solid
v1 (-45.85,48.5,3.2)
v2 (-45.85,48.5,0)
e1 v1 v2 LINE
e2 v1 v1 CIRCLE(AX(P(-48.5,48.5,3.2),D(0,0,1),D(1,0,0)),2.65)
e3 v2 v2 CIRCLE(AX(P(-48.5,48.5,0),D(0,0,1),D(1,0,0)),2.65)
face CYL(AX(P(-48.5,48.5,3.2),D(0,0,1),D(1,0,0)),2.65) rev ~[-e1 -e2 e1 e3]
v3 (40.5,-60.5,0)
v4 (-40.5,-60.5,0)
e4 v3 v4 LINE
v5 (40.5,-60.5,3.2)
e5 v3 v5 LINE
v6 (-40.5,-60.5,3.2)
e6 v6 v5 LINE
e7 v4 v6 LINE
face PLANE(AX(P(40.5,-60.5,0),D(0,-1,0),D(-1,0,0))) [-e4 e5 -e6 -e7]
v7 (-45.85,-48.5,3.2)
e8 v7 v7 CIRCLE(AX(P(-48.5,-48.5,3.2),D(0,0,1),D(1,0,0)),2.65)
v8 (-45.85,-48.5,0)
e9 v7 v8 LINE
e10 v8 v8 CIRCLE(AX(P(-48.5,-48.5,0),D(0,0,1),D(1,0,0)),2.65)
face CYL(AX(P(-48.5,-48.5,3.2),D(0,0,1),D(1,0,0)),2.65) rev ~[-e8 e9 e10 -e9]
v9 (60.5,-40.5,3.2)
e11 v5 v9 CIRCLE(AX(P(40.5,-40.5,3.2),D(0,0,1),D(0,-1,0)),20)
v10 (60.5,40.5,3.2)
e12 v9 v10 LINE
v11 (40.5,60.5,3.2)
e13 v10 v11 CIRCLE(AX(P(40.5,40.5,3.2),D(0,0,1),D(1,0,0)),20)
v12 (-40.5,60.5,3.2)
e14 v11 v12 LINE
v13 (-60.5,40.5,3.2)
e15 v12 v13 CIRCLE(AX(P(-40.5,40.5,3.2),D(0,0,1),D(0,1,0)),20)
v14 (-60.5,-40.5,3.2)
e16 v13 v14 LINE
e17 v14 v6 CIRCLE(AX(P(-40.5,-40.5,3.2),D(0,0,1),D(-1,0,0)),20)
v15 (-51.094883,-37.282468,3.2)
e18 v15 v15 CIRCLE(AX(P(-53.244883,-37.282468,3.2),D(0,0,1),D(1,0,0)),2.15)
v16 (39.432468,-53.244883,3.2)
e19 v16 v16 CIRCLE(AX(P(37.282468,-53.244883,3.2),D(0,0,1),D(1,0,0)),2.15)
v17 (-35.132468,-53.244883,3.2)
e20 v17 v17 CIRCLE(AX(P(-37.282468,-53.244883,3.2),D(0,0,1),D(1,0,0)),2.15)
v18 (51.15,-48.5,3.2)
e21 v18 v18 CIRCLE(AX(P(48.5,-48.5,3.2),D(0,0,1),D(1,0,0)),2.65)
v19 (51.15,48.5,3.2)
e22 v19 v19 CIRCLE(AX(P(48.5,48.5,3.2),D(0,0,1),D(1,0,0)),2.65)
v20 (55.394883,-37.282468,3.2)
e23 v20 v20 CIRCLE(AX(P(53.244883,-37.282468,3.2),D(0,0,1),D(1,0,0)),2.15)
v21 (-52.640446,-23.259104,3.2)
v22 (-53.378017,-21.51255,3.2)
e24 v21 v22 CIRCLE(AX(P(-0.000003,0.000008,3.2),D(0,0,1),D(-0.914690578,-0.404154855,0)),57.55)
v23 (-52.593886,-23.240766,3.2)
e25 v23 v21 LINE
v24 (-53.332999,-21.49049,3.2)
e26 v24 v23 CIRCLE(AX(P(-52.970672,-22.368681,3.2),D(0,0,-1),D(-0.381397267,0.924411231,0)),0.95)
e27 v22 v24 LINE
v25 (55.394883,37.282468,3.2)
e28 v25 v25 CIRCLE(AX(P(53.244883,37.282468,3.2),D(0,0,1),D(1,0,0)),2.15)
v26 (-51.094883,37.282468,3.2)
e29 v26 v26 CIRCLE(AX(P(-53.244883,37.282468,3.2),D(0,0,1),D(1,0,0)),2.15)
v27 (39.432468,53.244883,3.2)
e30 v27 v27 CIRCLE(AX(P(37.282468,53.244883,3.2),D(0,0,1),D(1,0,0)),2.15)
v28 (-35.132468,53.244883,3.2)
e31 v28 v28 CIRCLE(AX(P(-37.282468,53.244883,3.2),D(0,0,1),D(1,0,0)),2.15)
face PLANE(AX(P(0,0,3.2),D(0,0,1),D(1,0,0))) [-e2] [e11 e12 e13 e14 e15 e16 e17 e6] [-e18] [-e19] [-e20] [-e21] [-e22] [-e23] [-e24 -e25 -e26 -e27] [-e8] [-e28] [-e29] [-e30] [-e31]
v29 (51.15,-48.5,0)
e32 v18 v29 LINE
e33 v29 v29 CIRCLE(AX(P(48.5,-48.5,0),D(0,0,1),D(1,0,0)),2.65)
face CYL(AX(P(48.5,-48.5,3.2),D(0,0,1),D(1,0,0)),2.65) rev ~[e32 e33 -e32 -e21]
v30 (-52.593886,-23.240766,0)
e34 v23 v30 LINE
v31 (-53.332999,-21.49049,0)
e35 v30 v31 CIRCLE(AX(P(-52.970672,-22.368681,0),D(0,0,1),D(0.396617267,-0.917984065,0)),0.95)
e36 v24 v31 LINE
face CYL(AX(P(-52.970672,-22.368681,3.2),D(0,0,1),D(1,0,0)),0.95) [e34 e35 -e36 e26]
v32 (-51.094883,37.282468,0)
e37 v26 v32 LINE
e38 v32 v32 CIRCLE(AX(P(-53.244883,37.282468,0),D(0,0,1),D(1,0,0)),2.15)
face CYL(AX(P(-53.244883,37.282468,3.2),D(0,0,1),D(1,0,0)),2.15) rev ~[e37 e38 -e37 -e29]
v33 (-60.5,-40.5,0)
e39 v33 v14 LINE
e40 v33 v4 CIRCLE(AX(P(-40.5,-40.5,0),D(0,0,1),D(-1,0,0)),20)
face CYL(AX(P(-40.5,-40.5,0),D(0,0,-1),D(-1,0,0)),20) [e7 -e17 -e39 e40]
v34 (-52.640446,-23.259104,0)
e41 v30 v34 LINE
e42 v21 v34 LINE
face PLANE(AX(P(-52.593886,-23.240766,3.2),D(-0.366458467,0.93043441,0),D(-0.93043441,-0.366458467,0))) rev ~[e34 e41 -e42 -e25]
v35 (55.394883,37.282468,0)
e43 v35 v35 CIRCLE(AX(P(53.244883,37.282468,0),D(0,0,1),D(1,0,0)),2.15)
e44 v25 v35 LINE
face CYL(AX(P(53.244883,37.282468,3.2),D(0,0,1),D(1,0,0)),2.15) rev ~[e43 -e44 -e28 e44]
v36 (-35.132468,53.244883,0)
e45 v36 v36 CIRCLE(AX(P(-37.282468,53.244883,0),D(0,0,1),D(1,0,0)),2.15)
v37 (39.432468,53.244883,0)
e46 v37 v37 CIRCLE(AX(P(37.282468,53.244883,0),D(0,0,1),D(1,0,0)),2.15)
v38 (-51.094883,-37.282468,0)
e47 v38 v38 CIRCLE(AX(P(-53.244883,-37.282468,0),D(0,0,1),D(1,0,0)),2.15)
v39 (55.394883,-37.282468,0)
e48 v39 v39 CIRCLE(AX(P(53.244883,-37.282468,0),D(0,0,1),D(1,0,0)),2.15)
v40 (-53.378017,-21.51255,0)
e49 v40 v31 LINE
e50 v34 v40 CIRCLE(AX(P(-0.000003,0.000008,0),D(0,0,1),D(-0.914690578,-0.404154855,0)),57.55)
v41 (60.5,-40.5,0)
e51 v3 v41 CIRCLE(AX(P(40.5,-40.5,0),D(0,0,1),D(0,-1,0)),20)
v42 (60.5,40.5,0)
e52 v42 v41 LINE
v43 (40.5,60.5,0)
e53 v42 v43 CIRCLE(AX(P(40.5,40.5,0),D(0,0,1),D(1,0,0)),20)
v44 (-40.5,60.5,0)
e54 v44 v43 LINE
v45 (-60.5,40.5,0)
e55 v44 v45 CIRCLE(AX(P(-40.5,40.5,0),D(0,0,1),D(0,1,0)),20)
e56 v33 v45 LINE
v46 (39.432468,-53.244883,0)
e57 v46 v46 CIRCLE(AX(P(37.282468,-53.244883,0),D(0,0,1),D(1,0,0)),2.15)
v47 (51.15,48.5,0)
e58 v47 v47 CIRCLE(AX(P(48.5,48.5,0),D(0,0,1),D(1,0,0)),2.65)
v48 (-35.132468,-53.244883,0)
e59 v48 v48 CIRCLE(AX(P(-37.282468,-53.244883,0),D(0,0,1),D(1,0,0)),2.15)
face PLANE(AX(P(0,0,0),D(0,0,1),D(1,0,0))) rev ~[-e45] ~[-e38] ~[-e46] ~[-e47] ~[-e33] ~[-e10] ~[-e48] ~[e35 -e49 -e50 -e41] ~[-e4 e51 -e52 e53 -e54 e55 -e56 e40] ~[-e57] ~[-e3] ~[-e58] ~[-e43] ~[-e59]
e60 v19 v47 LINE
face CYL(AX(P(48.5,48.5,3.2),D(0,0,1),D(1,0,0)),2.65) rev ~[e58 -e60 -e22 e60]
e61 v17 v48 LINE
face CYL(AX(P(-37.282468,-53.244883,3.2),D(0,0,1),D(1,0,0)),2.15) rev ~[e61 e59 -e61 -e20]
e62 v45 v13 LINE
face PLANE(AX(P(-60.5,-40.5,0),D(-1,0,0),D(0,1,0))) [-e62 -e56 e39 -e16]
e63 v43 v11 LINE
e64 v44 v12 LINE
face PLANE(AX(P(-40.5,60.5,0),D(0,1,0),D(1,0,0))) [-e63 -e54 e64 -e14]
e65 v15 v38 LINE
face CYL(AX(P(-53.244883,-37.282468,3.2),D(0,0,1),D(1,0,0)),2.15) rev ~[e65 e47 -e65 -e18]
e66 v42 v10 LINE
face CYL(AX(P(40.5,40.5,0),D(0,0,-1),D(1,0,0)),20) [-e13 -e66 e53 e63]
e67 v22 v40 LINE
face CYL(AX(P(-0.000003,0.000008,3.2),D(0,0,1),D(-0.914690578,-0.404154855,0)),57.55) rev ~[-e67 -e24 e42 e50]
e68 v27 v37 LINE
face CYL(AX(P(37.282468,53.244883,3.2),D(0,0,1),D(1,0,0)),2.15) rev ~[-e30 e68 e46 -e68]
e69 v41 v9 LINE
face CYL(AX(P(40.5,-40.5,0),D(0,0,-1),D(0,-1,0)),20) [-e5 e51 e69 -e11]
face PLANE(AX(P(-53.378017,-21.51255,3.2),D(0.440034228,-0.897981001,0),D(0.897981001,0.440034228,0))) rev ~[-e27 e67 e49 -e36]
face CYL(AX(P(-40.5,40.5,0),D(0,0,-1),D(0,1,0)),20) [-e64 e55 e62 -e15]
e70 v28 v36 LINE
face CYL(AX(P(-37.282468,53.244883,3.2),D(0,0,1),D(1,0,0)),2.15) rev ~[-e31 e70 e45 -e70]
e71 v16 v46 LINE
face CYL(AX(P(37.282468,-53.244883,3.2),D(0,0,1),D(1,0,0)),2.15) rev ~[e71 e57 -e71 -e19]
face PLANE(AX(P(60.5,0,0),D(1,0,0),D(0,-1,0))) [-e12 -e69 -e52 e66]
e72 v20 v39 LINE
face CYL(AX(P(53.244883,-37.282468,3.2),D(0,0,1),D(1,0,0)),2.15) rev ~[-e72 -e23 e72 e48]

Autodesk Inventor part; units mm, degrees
ref_plane "YZ Plane" through (0, 0, 0) normal (1, 0, 0) x (0, 1, 0)
ref_plane "XZ Plane" through (0, 0, 0) normal (0, 1, 0) x (-1, 0, 0)
ref_plane "XY Plane" through (0, 0, 0) normal (0, 0, 1) x (1, 0, 0)
sketch "Sketch1" plane through (0, 0, 0) normal (0, 0, 1) x (1, 0, 0)
  circle A0 centre (0, 0) radius 57.5
  circle A1 centre (0, 0) radius 60.5
  line L0 (-40.5, 60.5) -> (40.5, 60.5)
  line L1 (60.5, 40.5) -> (60.5, -40.5)
  line L2 (40.5, -60.5) -> (-40.5, -60.5)
  line L3 (-60.5, -40.5) -> (-60.5, 40.5)
  arc A2 (-40.5, 60.5) -> (-60.5, 40.5) centre (-40.5, 40.5) ccw
  arc A3 (60.5, 40.5) -> (40.5, 60.5) centre (40.5, 40.5) ccw
  arc A4 (40.5, -60.5) -> (60.5, -40.5) centre (40.5, -40.5) ccw
  arc A5 (-60.5, -40.5) -> (-40.5, -60.5) centre (-40.5, -40.5) ccw
  dimension "d0" = 115
  dimension "d1" = 121
  dimension "d2" = 20
extrude "Extrusion1" add sketch "Sketch1" along normal blind 3.2
sketch "Sketch3" plane through (0, 0, 3.2) normal (0, 0, 1) x (1, 0, 0)
  circle A0 centre (-37.282468, -53.244883) radius 2.15
  circle A1 centre (-48.5, -48.5) radius 2.65
  circle A2 centre (-53.244883, -37.282468) radius 2.15
  circle A3 centre (-53.244883, 37.282468) radius 2.15
  circle A4 centre (-48.5, 48.5) radius 2.65
  circle A5 centre (-37.282468, 53.244883) radius 2.15
  circle A6 centre (37.282468, 53.244883) radius 2.15
  circle A7 centre (48.5, 48.5) radius 2.65
  circle A8 centre (53.244883, 37.282468) radius 2.15
  circle A9 centre (53.244883, -37.282468) radius 2.15
  circle A10 centre (48.5, -48.5) radius 2.65
  circle A11 centre (37.282468, -53.244883) radius 2.15
  point P0 (0, 0)
extrude "Extrusion3" cut sketch "Sketch3" against normal through all
sketch "Sketch4" plane through (0, 0, 3.2) normal (0, 0, 1) x (1, 0, 0)
  arc A0 (-52.049443, -21.979661) -> (-53.351667, -21.444104) centre (-52.970672, -22.368681) ccw
  arc A1 (-52.573656, -23.286493) -> (-52.049443, -21.979661) centre (-52.970672, -22.368681) ccw
  circle A2 centre (-52.970672, -22.368681) radius 0.95
  point P0 (0, 0)
  dimension "d28" = 1.9
extrude "Extrusion4" add sketch "Sketch4" against normal up to surface (3.2 mm away)
sketch "Sketch5" plane through (0, 0, 3.2) normal (0, 0, 1) x (1, 0, 0)
  arc A0 (-52.593886, -23.240766) -> (-53.332999, -21.49049) centre (0, 0) ccw
  circle A1 centre (0, 0) radius 57.55
  arc A2 (-52.593886, -23.240766) -> (-53.332999, -21.49049) centre (-52.970672, -22.368681) ccw
  line L0 (-52.593886, -23.240766) -> (-52.651569, -23.263484)
  line L1 (-53.332999, -21.49049) -> (-53.442689, -21.544242)
  point P0 (-52.640446, -23.259104)
  point P1 (-53.378017, -21.51255)
  dimension "d31" = 0.05
sketch "Sketch5 outline for Extrusion5" plane through (0, 0, 3.2) normal (0, 0, 1) x (1, 0, 0)
  arc A0 (-53.332999, -21.49049) -> (-52.593886, -23.240766) centre (0, 0) cw
  line L0 (-53.378017, -21.51255) -> (-53.332999, -21.49049)
  arc A1 (-52.640446, -23.259104) -> (-53.378017, -21.51255) centre (0, 0) ccw
  line L1 (-52.593886, -23.240766) -> (-52.640446, -23.259104)
extrude "Extrusion5" cut sketch "Sketch5 outline for Extrusion5" against normal through all
properties part number "stator_center_00_alu"
